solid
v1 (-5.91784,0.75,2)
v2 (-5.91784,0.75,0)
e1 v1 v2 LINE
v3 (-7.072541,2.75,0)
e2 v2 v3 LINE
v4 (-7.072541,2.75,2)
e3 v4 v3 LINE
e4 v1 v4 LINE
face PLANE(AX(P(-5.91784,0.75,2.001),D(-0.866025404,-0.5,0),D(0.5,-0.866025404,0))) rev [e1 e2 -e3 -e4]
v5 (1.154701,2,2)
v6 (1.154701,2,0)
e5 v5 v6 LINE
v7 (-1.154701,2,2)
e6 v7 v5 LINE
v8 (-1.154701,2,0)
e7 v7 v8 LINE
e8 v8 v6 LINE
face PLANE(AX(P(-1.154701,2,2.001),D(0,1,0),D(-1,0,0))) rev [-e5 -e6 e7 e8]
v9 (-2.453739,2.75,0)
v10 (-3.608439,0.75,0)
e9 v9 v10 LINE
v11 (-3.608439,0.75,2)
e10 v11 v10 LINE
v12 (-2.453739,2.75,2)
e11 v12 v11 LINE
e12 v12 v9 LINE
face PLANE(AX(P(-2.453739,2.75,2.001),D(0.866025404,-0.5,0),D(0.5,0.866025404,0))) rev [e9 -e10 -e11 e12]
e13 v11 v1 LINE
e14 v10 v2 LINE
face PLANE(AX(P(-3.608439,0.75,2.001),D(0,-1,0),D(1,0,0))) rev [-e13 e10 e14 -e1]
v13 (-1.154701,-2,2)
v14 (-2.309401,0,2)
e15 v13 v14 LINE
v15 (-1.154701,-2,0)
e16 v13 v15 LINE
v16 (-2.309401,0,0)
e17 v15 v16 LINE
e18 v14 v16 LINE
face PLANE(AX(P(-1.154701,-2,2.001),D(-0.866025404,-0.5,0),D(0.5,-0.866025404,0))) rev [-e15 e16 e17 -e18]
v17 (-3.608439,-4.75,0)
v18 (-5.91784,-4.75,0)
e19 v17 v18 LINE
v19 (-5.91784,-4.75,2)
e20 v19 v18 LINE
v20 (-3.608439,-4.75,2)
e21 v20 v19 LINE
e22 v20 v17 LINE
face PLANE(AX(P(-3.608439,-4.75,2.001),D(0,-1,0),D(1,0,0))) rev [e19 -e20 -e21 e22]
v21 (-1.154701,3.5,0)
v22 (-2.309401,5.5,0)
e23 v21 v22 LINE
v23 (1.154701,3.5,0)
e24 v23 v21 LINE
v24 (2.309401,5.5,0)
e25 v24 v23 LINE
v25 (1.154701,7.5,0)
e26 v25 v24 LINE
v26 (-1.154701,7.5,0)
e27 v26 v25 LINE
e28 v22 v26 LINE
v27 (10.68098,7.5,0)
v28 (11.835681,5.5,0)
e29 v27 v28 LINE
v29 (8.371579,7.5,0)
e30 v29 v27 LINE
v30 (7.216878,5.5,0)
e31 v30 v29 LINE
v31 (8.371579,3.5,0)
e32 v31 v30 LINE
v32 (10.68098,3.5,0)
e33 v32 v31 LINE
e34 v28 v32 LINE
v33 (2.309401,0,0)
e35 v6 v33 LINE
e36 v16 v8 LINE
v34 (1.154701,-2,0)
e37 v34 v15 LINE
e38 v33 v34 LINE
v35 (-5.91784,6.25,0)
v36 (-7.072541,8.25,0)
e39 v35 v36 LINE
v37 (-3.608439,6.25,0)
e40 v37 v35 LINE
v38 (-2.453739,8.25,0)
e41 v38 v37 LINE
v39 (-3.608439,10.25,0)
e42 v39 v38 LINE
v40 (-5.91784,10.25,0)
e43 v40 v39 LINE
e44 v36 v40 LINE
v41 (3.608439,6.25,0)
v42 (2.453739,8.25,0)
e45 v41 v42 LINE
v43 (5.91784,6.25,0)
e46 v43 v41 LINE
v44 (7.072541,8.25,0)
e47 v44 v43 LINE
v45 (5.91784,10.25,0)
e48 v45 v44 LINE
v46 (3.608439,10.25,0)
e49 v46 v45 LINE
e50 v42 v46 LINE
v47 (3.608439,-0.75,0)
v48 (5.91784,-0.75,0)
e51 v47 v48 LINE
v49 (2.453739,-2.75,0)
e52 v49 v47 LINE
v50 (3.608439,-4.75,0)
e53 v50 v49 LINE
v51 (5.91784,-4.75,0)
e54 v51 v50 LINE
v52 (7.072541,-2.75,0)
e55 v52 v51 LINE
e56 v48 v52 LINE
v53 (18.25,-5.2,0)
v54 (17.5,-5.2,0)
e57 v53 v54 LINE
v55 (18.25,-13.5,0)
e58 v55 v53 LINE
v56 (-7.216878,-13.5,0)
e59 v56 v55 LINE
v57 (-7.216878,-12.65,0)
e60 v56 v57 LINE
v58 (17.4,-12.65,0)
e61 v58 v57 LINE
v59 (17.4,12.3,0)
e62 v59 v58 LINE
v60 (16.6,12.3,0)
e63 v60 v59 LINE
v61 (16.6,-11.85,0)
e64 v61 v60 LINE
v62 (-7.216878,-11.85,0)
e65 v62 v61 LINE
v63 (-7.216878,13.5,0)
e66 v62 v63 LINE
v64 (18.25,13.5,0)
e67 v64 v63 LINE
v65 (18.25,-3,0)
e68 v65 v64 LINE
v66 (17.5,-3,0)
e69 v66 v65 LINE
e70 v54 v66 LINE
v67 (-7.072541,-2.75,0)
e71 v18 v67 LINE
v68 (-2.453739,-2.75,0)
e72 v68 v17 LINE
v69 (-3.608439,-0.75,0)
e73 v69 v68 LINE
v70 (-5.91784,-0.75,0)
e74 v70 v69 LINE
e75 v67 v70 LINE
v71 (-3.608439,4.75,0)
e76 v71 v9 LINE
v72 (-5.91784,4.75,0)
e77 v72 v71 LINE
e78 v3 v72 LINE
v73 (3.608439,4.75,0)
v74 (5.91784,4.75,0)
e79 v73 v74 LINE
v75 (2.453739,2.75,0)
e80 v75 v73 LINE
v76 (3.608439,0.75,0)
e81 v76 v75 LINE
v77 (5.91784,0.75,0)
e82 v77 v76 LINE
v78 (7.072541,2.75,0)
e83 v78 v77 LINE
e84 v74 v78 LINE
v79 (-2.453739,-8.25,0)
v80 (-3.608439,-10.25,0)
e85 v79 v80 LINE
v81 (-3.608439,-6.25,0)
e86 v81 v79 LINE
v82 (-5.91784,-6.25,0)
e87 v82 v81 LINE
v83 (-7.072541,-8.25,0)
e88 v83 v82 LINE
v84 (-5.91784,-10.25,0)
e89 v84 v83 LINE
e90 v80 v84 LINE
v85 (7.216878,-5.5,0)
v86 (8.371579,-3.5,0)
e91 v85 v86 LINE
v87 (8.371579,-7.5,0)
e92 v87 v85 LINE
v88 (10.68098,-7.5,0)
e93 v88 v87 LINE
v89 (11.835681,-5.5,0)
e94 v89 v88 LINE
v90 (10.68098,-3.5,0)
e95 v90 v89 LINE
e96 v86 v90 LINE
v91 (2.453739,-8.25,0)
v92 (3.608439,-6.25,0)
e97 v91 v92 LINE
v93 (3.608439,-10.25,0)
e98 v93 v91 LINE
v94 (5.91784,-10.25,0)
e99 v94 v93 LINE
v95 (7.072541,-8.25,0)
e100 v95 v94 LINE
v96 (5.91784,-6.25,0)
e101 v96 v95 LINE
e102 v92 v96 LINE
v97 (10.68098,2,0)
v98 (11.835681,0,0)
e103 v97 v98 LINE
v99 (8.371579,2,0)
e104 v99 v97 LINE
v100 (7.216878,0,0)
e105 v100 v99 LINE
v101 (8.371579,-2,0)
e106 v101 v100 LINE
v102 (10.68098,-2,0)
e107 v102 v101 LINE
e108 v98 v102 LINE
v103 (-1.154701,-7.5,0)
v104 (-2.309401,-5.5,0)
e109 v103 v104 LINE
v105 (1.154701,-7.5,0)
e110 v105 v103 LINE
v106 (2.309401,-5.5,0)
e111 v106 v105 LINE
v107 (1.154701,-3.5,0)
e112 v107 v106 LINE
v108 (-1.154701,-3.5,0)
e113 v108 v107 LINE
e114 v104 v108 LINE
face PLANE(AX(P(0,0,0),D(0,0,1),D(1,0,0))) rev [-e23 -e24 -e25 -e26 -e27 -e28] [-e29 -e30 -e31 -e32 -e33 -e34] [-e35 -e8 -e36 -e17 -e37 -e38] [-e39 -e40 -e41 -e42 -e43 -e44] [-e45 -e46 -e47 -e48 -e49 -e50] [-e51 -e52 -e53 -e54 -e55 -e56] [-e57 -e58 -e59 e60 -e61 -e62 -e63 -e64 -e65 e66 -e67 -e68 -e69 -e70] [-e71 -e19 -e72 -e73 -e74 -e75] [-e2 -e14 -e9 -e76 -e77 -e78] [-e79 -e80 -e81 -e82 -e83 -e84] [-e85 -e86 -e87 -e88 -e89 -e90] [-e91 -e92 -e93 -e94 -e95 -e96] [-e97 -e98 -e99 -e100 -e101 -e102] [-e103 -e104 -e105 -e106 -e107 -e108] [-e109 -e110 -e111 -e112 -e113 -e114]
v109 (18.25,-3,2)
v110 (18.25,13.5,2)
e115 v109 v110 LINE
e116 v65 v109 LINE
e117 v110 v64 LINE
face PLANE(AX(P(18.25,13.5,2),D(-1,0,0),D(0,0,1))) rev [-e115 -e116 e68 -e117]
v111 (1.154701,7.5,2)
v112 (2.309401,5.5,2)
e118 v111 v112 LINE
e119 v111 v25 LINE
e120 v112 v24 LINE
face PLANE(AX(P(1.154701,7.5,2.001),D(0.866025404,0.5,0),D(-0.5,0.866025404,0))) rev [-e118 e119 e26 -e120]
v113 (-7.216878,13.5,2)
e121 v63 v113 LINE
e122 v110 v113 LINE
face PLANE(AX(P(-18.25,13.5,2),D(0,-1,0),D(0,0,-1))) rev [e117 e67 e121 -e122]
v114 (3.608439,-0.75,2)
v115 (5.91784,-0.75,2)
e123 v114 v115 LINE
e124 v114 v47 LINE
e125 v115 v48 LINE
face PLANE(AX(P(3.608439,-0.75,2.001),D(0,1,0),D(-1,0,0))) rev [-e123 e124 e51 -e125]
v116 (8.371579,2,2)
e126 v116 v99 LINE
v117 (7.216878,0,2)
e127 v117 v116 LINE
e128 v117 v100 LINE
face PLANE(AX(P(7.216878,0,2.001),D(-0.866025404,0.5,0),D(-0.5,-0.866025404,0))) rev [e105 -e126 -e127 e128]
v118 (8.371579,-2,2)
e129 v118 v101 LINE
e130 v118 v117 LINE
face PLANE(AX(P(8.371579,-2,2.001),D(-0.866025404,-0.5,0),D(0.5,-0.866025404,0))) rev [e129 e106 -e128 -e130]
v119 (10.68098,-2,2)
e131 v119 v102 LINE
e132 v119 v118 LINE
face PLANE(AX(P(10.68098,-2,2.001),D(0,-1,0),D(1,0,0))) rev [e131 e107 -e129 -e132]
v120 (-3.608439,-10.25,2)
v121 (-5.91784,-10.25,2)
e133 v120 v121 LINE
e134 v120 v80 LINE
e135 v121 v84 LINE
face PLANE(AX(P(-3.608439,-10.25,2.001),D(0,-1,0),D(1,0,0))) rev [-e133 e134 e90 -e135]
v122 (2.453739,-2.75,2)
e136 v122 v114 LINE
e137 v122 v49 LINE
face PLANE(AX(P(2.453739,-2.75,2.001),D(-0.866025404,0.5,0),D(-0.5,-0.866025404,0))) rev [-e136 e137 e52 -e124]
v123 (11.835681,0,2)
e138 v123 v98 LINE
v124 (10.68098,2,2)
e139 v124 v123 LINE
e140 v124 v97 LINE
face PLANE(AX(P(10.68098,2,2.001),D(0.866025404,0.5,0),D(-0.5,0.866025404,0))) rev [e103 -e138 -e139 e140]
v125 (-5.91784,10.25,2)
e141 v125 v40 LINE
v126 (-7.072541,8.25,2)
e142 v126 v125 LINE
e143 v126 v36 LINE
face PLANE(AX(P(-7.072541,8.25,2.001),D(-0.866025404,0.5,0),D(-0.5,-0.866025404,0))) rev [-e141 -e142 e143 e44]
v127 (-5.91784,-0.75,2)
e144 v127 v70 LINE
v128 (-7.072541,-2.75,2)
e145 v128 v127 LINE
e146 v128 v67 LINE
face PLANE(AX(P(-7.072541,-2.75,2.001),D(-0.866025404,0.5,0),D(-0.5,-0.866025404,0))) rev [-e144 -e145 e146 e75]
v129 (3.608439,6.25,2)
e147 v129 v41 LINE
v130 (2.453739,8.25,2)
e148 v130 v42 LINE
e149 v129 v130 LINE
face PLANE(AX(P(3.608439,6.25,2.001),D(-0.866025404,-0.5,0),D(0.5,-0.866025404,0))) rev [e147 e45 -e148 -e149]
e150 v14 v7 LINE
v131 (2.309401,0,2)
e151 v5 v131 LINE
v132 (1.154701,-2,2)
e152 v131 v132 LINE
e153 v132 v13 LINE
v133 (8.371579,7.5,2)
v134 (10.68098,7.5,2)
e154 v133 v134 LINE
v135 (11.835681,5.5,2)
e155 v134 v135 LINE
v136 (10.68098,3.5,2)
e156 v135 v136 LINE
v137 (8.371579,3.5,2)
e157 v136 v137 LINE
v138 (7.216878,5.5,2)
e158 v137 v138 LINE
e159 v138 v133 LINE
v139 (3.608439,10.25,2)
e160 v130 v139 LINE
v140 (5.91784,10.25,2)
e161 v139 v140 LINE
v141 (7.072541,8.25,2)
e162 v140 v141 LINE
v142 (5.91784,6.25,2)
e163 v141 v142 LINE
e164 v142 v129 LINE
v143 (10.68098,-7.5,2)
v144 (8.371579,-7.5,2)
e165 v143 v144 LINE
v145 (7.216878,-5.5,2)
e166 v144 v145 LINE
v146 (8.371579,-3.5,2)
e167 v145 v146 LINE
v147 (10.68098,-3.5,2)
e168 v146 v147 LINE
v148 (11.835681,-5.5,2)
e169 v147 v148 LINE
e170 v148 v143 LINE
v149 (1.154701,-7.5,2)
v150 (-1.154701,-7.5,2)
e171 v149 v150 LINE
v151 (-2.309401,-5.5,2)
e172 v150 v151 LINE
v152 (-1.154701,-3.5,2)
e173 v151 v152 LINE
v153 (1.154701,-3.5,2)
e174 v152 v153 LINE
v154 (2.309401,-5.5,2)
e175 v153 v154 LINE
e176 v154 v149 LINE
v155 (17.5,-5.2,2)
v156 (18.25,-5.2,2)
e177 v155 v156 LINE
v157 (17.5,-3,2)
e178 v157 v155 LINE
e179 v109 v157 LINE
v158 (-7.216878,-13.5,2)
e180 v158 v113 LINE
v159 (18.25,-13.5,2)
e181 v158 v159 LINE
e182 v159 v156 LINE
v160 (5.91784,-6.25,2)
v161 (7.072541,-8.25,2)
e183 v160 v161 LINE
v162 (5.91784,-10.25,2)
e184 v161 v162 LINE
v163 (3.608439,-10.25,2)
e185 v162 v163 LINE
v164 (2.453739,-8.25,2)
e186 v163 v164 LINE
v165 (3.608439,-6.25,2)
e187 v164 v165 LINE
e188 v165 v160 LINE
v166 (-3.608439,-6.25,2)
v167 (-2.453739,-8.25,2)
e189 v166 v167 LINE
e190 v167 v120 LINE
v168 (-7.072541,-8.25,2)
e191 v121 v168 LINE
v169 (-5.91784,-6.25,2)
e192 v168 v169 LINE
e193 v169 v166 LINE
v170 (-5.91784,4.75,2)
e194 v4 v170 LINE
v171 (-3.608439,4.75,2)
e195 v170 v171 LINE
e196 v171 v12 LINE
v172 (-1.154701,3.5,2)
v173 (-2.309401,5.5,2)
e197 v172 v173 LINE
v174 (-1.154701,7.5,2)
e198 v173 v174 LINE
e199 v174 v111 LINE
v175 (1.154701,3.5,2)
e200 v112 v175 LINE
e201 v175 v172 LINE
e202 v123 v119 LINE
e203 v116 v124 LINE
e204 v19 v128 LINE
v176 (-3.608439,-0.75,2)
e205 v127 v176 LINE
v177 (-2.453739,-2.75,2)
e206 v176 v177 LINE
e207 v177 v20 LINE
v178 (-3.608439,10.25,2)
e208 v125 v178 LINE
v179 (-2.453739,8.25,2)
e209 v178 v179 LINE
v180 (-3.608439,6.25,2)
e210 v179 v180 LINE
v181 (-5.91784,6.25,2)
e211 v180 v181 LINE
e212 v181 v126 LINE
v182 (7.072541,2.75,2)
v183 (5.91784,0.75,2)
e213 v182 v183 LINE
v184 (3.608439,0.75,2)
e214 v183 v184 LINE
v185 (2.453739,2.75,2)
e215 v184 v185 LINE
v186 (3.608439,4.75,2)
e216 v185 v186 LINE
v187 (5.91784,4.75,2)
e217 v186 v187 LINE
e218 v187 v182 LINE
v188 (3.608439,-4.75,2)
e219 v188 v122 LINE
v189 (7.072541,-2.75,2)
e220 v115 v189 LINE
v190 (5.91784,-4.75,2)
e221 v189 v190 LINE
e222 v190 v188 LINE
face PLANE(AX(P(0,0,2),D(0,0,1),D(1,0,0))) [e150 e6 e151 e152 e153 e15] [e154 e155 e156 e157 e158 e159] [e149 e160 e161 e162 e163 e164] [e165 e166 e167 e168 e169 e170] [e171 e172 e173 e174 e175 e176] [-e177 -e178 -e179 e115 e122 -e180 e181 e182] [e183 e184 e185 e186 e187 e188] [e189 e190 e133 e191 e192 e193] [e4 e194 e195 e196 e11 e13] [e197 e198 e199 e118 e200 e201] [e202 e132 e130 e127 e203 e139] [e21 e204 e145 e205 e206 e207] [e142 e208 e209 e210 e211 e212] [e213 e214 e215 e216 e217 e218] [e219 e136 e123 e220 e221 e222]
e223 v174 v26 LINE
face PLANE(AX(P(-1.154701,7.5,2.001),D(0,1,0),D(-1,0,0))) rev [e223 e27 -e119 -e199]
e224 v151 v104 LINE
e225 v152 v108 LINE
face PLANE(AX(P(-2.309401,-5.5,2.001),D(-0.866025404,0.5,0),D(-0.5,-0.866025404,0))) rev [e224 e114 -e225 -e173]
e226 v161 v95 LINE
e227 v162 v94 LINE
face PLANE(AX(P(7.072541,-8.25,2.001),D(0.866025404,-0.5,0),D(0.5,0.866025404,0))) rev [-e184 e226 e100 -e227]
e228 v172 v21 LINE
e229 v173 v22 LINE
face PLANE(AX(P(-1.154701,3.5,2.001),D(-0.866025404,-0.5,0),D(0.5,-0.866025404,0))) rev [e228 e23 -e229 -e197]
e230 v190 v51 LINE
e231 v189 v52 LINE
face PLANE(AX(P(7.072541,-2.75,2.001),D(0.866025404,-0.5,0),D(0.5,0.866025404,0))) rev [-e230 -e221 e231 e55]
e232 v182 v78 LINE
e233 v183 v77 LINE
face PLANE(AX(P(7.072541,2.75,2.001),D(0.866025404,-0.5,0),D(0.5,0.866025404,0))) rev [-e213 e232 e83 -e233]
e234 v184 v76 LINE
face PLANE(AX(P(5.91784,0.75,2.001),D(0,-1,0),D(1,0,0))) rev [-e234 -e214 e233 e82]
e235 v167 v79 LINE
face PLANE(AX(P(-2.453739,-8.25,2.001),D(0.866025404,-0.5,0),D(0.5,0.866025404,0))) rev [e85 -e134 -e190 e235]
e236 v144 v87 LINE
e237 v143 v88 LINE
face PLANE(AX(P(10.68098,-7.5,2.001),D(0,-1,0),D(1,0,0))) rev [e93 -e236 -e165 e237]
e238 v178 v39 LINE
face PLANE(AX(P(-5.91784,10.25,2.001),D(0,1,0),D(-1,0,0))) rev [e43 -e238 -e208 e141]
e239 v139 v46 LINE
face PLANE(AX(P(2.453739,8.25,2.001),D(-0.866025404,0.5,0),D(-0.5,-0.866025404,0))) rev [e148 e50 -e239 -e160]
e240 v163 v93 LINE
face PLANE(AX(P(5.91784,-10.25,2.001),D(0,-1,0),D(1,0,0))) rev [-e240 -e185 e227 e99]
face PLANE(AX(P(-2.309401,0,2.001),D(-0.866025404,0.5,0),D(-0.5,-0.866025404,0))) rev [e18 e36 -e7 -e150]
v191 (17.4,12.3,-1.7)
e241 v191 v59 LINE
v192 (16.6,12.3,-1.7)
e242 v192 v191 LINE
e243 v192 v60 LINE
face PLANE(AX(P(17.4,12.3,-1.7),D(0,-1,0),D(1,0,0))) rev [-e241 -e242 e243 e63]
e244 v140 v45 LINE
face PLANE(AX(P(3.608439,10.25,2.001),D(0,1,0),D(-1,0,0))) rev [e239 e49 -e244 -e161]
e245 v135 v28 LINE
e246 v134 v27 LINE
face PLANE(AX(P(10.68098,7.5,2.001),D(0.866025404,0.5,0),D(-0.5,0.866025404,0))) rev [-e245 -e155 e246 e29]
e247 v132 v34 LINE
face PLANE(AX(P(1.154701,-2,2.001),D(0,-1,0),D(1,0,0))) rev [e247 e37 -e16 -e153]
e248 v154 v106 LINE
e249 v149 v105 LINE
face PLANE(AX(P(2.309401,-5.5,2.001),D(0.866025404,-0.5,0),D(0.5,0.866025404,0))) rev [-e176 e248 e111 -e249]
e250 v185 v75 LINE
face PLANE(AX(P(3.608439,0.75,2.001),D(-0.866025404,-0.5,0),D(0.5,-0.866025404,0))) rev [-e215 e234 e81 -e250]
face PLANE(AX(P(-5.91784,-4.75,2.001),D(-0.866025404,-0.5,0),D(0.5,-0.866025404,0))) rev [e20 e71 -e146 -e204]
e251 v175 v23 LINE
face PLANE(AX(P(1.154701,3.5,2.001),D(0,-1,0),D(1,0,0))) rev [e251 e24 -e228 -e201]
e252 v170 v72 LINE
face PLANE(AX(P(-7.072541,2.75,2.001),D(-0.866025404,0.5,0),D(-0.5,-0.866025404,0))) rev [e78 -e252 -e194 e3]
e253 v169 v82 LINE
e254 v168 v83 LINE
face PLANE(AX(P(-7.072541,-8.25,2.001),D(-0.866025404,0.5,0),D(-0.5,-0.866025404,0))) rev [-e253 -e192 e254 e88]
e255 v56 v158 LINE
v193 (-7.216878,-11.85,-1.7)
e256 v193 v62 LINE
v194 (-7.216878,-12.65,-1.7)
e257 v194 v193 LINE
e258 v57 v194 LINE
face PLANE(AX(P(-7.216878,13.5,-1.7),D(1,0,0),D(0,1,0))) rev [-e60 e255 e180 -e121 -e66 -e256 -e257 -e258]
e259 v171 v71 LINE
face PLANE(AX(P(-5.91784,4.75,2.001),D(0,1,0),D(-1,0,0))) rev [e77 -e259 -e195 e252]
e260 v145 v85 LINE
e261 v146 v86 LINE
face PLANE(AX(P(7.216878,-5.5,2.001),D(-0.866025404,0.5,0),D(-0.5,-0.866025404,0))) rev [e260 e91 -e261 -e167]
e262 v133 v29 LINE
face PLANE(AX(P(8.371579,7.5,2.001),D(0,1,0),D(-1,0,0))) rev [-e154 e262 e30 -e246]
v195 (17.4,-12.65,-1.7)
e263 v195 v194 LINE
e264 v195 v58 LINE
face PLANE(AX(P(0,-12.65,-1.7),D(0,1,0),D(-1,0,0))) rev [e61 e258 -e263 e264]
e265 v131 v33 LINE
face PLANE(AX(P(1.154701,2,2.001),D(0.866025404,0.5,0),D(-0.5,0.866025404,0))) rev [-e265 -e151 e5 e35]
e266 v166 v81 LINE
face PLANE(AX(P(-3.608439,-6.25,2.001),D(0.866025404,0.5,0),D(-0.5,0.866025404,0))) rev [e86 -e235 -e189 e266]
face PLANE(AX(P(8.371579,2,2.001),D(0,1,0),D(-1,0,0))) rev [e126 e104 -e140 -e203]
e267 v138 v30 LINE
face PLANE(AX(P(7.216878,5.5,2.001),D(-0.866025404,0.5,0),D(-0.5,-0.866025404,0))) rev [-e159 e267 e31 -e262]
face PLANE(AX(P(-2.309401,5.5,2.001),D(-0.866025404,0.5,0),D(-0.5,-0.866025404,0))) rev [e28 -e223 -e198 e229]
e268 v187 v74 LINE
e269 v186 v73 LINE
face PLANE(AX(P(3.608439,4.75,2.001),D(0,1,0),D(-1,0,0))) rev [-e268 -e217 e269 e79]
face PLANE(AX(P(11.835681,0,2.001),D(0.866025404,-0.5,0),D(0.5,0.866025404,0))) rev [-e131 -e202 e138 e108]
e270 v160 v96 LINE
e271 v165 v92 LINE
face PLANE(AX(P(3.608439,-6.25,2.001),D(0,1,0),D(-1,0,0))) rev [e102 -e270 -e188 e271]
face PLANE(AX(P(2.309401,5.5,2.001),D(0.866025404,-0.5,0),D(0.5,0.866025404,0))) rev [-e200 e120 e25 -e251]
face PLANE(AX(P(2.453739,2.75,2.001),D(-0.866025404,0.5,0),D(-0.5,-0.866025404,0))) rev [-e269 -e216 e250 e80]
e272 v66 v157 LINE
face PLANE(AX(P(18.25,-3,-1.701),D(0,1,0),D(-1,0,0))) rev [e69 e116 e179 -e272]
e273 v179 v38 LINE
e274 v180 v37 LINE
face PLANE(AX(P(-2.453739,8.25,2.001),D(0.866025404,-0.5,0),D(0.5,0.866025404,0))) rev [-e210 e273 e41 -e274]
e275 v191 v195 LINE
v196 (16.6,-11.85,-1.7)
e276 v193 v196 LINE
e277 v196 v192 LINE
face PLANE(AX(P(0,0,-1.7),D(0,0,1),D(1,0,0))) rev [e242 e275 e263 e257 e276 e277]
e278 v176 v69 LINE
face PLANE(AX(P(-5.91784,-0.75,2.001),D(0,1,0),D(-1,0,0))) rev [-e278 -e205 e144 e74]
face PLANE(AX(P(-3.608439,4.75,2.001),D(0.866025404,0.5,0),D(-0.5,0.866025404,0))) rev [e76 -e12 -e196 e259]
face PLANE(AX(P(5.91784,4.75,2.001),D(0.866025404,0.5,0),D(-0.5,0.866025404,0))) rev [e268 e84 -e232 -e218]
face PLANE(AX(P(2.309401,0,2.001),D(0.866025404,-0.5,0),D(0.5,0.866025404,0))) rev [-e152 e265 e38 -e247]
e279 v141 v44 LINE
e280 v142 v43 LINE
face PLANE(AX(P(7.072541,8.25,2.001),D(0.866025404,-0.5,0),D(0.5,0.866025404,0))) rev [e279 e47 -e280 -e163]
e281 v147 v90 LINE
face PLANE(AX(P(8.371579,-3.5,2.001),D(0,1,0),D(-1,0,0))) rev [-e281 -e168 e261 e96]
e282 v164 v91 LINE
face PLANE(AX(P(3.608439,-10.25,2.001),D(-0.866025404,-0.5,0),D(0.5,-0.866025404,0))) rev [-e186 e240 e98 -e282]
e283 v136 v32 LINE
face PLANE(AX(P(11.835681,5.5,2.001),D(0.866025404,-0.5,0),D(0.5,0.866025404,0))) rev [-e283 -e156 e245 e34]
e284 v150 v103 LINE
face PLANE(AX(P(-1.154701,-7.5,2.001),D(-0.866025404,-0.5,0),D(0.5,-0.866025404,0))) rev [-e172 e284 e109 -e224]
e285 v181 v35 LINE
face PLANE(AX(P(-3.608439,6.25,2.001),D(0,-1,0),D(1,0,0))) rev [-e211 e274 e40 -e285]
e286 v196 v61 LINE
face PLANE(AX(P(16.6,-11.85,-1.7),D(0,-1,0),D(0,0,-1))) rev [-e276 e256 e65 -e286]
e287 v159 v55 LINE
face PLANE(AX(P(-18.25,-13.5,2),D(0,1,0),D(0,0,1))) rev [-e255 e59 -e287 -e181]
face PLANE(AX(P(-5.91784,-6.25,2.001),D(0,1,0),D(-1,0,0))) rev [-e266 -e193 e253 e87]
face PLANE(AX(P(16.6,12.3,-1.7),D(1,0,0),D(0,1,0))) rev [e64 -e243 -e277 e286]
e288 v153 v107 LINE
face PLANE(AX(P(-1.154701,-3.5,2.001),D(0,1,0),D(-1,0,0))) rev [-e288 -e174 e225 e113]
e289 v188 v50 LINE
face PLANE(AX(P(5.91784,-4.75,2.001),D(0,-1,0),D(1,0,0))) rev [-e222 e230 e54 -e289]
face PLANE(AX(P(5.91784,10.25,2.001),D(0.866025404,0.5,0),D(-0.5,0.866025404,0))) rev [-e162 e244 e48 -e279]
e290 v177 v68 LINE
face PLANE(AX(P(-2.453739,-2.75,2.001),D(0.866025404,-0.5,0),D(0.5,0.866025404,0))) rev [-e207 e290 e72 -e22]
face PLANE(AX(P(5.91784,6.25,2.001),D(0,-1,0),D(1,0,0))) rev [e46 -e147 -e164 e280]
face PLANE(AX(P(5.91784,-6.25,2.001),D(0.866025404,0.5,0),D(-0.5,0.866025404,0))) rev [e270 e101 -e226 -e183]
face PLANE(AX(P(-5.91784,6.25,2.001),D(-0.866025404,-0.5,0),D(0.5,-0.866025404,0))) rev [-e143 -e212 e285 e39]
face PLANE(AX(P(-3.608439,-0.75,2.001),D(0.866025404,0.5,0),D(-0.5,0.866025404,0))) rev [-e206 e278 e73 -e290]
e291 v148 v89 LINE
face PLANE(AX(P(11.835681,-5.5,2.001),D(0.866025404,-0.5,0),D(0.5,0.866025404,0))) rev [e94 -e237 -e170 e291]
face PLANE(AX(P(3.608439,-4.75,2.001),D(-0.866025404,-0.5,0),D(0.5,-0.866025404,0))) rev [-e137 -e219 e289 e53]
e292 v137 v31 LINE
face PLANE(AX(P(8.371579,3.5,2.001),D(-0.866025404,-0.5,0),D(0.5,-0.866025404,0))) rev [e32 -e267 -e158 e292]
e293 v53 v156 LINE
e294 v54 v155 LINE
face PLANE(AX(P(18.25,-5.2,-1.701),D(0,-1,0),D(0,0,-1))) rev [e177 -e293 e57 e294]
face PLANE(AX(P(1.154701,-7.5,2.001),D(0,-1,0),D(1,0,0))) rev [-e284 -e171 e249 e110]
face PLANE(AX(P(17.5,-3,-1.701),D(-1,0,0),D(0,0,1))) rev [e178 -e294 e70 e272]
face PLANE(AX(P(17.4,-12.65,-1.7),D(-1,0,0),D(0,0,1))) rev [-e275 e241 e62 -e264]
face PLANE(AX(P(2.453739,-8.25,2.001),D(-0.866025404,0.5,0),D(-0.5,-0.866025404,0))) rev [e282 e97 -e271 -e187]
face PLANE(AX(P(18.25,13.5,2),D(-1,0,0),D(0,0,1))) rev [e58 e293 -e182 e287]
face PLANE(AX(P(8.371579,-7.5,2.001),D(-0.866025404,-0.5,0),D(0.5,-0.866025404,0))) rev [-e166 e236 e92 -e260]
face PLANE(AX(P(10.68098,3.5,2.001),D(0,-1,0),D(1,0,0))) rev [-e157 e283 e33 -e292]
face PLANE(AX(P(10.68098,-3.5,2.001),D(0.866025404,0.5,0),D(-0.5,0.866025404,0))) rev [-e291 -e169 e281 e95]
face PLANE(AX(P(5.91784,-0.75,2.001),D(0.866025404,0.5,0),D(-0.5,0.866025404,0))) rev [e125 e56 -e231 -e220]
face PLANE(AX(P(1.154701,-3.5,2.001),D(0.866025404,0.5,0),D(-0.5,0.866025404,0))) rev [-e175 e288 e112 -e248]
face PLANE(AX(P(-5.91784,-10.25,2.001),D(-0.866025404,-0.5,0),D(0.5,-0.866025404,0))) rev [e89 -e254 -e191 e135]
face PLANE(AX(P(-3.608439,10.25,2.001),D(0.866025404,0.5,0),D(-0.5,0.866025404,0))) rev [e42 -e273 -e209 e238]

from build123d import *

# Parameters (mm, degrees)
SKETCH1_W           = 36.5
SKETCH1_H           = 27
BOSS_EXTRUDE1_DEPTH = 2
BOSS_EXTRUDE2_DEPTH = 1.7
CUT_EXTRUDE1_REACH  = 24.788
FILL_PATTERN1_DEPTH = 2
CUT_EXTRUDE3_REACH  = 25
SKETCH5_W           = 0.75
SKETCH5_H           = 2.2
SKETCH6_W           = 11.033121635
SKETCH6_H           = 27
CUT_EXTRUDE4_DEPTH  = 24.000054348


# Read off the part's stored shape, not the designer's step: Fill Pattern1
with BuildPart() as part:
    # Sketch1 → Boss-Extrude1 (new body)
    with BuildSketch(Plane.XY):
        Rectangle(SKETCH1_W, SKETCH1_H)
    extrude(amount=BOSS_EXTRUDE1_DEPTH)

    # Sketch2 → Boss-Extrude2 (add)
    with BuildSketch(Plane(origin=(0, 0, 0), x_dir=(-1, 0, 0), z_dir=(0, 0, -1))):
        Polygon((-17.4, 12.3), (-16.6, 12.3), (-16.6, -11.85), (0, -11.85), (0, -12.65), (-17.4, -12.65), align=None)
    boss_extrude2 = extrude(amount=BOSS_EXTRUDE2_DEPTH)

    # Mirror1: Boss-Extrude2 across plane
    add(boss_extrude2.mirror(Plane(origin=(0, 0, 0), x_dir=(0, 0, 1), z_dir=(1, 0, 0))))

    # Sketch3 → Cut-Extrude1 (cut, up to next)
    with BuildSketch(Plane(origin=(0, 0, 0), x_dir=(-1, 0, 0), z_dir=(0, 0, -1)), mode=Mode.PRIVATE) as cut_extrude1_sk1:
        Polygon((-1.154700538, 2), (-2.309401077, 0), (-1.154700538, -2), (1.154700538, -2), (2.309401077, 0), (1.154700538, 2), align=None)
    cut_extrude1_tool1 = extrude(cut_extrude1_sk1.sketch, amount=-CUT_EXTRUDE1_REACH, mode=Mode.PRIVATE) & part.part
    add(cut_extrude1_tool1.solids().sort_by_distance((0, 0, 0))[0], mode=Mode.SUBTRACT)

    # Fill Pattern1 outline → Fill Pattern1 (cut)
    with BuildSketch(Plane.XY):
        Polygon((11.835680518, 0), (10.68097998, 2), (8.371578903, 2), (7.216878365, 0), (8.371578903, -2), (10.68097998, -2), align=None)
        Polygon((-7.216878365, 0), (-8.371578903, 2), (-10.68097998, 2), (-11.835680518, 0), (-10.68097998, -2), (-8.371578903, -2), align=None)
        Polygon((-3.608439182, -6.25), (-5.917840259, -6.25), (-7.072540798, -8.25), (-5.917840259, -10.25), (-3.608439182, -10.25), (-2.453738644, -8.25), align=None)
        Polygon((5.917840259, 10.25), (3.608439182, 10.25), (2.453738644, 8.25), (3.608439182, 6.25), (5.917840259, 6.25), (7.072540798, 8.25), align=None)
        Polygon((-5.917840259, 10.25), (-7.072540798, 8.25), (-5.917840259, 6.25), (-3.608439182, 6.25), (-2.453738644, 8.25), (-3.608439182, 10.25), align=None)
        Polygon((3.608439182, -6.25), (2.453738644, -8.25), (3.608439182, -10.25), (5.917840259, -10.25), (7.072540798, -8.25), (5.917840259, -6.25), align=None)
        Polygon((2.309401077, 5.5), (1.154700538, 7.5), (-1.154700538, 7.5), (-2.309401077, 5.5), (-1.154700538, 3.5), (1.154700538, 3.5), align=None)
        Polygon((-7.216878365, 5.5), (-8.371578903, 7.5), (-10.68097998, 7.5), (-11.835680518, 5.5), (-10.68097998, 3.5), (-8.371578903, 3.5), align=None)
        Polygon((11.835680518, 5.5), (10.68097998, 7.5), (8.371578903, 7.5), (7.216878365, 5.5), (8.371578903, 3.5), (10.68097998, 3.5), align=None)
        Polygon((-3.608439182, -0.75), (-5.917840259, -0.75), (-7.072540798, -2.75), (-5.917840259, -4.75), (-3.608439182, -4.75), (-2.453738644, -2.75), align=None)
        Polygon((3.608439182, -0.75), (2.453738644, -2.75), (3.608439182, -4.75), (5.917840259, -4.75), (7.072540798, -2.75), (5.917840259, -0.75), align=None)
        Polygon((7.072540798, 2.75), (5.917840259, 4.75), (3.608439182, 4.75), (2.453738644, 2.75), (3.608439182, 0.75), (5.917840259, 0.75), align=None)
        Polygon((-2.453738644, 2.75), (-3.608439182, 4.75), (-5.917840259, 4.75), (-7.072540798, 2.75), (-5.917840259, 0.75), (-3.608439182, 0.75), align=None)
        Polygon((1.154700538, -3.5), (-1.154700538, -3.5), (-2.309401077, -5.5), (-1.154700538, -7.5), (1.154700538, -7.5), (2.309401077, -5.5), align=None)
        Polygon((8.371578903, -3.5), (7.216878365, -5.5), (8.371578903, -7.5), (10.68097998, -7.5), (11.835680518, -5.5), (10.68097998, -3.5), align=None)
        Polygon((-7.216878365, -5.5), (-8.371578903, -3.5), (-10.68097998, -3.5), (-11.835680518, -5.5), (-10.68097998, -7.5), (-8.371578903, -7.5), align=None)
    extrude(amount=FILL_PATTERN1_DEPTH, mode=Mode.SUBTRACT)

    # Sketch5 → Cut-Extrude3 (cut, up to next)
    with BuildSketch(Plane.XY.offset(2), mode=Mode.PRIVATE) as cut_extrude3_sk1:
        with Locations((17.875, -4.1)):
            Rectangle(SKETCH5_W, SKETCH5_H)
    cut_extrude3_tool1 = extrude(cut_extrude3_sk1.sketch, amount=-CUT_EXTRUDE3_REACH, mode=Mode.PRIVATE) & part.part
    cut_extrude3 = cut_extrude3_tool1.solids().sort_by_distance((17.875, -4.1, 2))[0]
    add(cut_extrude3, mode=Mode.SUBTRACT)

    # Mirror2: Cut-Extrude3 across plane
    add(cut_extrude3.mirror(Plane(origin=(0, 0, 0), x_dir=(0, 0, 1), z_dir=(1, 0, 0))), mode=Mode.SUBTRACT)

    # Sketch6 → Cut-Extrude4 (cut, through all)
    with BuildSketch(Plane.XY.offset(2)):
        with Locations((-12.733439182, 0)):
            Rectangle(SKETCH6_W, SKETCH6_H)
    extrude(amount=-CUT_EXTRUDE4_DEPTH, mode=Mode.SUBTRACT)


solid = part.part
